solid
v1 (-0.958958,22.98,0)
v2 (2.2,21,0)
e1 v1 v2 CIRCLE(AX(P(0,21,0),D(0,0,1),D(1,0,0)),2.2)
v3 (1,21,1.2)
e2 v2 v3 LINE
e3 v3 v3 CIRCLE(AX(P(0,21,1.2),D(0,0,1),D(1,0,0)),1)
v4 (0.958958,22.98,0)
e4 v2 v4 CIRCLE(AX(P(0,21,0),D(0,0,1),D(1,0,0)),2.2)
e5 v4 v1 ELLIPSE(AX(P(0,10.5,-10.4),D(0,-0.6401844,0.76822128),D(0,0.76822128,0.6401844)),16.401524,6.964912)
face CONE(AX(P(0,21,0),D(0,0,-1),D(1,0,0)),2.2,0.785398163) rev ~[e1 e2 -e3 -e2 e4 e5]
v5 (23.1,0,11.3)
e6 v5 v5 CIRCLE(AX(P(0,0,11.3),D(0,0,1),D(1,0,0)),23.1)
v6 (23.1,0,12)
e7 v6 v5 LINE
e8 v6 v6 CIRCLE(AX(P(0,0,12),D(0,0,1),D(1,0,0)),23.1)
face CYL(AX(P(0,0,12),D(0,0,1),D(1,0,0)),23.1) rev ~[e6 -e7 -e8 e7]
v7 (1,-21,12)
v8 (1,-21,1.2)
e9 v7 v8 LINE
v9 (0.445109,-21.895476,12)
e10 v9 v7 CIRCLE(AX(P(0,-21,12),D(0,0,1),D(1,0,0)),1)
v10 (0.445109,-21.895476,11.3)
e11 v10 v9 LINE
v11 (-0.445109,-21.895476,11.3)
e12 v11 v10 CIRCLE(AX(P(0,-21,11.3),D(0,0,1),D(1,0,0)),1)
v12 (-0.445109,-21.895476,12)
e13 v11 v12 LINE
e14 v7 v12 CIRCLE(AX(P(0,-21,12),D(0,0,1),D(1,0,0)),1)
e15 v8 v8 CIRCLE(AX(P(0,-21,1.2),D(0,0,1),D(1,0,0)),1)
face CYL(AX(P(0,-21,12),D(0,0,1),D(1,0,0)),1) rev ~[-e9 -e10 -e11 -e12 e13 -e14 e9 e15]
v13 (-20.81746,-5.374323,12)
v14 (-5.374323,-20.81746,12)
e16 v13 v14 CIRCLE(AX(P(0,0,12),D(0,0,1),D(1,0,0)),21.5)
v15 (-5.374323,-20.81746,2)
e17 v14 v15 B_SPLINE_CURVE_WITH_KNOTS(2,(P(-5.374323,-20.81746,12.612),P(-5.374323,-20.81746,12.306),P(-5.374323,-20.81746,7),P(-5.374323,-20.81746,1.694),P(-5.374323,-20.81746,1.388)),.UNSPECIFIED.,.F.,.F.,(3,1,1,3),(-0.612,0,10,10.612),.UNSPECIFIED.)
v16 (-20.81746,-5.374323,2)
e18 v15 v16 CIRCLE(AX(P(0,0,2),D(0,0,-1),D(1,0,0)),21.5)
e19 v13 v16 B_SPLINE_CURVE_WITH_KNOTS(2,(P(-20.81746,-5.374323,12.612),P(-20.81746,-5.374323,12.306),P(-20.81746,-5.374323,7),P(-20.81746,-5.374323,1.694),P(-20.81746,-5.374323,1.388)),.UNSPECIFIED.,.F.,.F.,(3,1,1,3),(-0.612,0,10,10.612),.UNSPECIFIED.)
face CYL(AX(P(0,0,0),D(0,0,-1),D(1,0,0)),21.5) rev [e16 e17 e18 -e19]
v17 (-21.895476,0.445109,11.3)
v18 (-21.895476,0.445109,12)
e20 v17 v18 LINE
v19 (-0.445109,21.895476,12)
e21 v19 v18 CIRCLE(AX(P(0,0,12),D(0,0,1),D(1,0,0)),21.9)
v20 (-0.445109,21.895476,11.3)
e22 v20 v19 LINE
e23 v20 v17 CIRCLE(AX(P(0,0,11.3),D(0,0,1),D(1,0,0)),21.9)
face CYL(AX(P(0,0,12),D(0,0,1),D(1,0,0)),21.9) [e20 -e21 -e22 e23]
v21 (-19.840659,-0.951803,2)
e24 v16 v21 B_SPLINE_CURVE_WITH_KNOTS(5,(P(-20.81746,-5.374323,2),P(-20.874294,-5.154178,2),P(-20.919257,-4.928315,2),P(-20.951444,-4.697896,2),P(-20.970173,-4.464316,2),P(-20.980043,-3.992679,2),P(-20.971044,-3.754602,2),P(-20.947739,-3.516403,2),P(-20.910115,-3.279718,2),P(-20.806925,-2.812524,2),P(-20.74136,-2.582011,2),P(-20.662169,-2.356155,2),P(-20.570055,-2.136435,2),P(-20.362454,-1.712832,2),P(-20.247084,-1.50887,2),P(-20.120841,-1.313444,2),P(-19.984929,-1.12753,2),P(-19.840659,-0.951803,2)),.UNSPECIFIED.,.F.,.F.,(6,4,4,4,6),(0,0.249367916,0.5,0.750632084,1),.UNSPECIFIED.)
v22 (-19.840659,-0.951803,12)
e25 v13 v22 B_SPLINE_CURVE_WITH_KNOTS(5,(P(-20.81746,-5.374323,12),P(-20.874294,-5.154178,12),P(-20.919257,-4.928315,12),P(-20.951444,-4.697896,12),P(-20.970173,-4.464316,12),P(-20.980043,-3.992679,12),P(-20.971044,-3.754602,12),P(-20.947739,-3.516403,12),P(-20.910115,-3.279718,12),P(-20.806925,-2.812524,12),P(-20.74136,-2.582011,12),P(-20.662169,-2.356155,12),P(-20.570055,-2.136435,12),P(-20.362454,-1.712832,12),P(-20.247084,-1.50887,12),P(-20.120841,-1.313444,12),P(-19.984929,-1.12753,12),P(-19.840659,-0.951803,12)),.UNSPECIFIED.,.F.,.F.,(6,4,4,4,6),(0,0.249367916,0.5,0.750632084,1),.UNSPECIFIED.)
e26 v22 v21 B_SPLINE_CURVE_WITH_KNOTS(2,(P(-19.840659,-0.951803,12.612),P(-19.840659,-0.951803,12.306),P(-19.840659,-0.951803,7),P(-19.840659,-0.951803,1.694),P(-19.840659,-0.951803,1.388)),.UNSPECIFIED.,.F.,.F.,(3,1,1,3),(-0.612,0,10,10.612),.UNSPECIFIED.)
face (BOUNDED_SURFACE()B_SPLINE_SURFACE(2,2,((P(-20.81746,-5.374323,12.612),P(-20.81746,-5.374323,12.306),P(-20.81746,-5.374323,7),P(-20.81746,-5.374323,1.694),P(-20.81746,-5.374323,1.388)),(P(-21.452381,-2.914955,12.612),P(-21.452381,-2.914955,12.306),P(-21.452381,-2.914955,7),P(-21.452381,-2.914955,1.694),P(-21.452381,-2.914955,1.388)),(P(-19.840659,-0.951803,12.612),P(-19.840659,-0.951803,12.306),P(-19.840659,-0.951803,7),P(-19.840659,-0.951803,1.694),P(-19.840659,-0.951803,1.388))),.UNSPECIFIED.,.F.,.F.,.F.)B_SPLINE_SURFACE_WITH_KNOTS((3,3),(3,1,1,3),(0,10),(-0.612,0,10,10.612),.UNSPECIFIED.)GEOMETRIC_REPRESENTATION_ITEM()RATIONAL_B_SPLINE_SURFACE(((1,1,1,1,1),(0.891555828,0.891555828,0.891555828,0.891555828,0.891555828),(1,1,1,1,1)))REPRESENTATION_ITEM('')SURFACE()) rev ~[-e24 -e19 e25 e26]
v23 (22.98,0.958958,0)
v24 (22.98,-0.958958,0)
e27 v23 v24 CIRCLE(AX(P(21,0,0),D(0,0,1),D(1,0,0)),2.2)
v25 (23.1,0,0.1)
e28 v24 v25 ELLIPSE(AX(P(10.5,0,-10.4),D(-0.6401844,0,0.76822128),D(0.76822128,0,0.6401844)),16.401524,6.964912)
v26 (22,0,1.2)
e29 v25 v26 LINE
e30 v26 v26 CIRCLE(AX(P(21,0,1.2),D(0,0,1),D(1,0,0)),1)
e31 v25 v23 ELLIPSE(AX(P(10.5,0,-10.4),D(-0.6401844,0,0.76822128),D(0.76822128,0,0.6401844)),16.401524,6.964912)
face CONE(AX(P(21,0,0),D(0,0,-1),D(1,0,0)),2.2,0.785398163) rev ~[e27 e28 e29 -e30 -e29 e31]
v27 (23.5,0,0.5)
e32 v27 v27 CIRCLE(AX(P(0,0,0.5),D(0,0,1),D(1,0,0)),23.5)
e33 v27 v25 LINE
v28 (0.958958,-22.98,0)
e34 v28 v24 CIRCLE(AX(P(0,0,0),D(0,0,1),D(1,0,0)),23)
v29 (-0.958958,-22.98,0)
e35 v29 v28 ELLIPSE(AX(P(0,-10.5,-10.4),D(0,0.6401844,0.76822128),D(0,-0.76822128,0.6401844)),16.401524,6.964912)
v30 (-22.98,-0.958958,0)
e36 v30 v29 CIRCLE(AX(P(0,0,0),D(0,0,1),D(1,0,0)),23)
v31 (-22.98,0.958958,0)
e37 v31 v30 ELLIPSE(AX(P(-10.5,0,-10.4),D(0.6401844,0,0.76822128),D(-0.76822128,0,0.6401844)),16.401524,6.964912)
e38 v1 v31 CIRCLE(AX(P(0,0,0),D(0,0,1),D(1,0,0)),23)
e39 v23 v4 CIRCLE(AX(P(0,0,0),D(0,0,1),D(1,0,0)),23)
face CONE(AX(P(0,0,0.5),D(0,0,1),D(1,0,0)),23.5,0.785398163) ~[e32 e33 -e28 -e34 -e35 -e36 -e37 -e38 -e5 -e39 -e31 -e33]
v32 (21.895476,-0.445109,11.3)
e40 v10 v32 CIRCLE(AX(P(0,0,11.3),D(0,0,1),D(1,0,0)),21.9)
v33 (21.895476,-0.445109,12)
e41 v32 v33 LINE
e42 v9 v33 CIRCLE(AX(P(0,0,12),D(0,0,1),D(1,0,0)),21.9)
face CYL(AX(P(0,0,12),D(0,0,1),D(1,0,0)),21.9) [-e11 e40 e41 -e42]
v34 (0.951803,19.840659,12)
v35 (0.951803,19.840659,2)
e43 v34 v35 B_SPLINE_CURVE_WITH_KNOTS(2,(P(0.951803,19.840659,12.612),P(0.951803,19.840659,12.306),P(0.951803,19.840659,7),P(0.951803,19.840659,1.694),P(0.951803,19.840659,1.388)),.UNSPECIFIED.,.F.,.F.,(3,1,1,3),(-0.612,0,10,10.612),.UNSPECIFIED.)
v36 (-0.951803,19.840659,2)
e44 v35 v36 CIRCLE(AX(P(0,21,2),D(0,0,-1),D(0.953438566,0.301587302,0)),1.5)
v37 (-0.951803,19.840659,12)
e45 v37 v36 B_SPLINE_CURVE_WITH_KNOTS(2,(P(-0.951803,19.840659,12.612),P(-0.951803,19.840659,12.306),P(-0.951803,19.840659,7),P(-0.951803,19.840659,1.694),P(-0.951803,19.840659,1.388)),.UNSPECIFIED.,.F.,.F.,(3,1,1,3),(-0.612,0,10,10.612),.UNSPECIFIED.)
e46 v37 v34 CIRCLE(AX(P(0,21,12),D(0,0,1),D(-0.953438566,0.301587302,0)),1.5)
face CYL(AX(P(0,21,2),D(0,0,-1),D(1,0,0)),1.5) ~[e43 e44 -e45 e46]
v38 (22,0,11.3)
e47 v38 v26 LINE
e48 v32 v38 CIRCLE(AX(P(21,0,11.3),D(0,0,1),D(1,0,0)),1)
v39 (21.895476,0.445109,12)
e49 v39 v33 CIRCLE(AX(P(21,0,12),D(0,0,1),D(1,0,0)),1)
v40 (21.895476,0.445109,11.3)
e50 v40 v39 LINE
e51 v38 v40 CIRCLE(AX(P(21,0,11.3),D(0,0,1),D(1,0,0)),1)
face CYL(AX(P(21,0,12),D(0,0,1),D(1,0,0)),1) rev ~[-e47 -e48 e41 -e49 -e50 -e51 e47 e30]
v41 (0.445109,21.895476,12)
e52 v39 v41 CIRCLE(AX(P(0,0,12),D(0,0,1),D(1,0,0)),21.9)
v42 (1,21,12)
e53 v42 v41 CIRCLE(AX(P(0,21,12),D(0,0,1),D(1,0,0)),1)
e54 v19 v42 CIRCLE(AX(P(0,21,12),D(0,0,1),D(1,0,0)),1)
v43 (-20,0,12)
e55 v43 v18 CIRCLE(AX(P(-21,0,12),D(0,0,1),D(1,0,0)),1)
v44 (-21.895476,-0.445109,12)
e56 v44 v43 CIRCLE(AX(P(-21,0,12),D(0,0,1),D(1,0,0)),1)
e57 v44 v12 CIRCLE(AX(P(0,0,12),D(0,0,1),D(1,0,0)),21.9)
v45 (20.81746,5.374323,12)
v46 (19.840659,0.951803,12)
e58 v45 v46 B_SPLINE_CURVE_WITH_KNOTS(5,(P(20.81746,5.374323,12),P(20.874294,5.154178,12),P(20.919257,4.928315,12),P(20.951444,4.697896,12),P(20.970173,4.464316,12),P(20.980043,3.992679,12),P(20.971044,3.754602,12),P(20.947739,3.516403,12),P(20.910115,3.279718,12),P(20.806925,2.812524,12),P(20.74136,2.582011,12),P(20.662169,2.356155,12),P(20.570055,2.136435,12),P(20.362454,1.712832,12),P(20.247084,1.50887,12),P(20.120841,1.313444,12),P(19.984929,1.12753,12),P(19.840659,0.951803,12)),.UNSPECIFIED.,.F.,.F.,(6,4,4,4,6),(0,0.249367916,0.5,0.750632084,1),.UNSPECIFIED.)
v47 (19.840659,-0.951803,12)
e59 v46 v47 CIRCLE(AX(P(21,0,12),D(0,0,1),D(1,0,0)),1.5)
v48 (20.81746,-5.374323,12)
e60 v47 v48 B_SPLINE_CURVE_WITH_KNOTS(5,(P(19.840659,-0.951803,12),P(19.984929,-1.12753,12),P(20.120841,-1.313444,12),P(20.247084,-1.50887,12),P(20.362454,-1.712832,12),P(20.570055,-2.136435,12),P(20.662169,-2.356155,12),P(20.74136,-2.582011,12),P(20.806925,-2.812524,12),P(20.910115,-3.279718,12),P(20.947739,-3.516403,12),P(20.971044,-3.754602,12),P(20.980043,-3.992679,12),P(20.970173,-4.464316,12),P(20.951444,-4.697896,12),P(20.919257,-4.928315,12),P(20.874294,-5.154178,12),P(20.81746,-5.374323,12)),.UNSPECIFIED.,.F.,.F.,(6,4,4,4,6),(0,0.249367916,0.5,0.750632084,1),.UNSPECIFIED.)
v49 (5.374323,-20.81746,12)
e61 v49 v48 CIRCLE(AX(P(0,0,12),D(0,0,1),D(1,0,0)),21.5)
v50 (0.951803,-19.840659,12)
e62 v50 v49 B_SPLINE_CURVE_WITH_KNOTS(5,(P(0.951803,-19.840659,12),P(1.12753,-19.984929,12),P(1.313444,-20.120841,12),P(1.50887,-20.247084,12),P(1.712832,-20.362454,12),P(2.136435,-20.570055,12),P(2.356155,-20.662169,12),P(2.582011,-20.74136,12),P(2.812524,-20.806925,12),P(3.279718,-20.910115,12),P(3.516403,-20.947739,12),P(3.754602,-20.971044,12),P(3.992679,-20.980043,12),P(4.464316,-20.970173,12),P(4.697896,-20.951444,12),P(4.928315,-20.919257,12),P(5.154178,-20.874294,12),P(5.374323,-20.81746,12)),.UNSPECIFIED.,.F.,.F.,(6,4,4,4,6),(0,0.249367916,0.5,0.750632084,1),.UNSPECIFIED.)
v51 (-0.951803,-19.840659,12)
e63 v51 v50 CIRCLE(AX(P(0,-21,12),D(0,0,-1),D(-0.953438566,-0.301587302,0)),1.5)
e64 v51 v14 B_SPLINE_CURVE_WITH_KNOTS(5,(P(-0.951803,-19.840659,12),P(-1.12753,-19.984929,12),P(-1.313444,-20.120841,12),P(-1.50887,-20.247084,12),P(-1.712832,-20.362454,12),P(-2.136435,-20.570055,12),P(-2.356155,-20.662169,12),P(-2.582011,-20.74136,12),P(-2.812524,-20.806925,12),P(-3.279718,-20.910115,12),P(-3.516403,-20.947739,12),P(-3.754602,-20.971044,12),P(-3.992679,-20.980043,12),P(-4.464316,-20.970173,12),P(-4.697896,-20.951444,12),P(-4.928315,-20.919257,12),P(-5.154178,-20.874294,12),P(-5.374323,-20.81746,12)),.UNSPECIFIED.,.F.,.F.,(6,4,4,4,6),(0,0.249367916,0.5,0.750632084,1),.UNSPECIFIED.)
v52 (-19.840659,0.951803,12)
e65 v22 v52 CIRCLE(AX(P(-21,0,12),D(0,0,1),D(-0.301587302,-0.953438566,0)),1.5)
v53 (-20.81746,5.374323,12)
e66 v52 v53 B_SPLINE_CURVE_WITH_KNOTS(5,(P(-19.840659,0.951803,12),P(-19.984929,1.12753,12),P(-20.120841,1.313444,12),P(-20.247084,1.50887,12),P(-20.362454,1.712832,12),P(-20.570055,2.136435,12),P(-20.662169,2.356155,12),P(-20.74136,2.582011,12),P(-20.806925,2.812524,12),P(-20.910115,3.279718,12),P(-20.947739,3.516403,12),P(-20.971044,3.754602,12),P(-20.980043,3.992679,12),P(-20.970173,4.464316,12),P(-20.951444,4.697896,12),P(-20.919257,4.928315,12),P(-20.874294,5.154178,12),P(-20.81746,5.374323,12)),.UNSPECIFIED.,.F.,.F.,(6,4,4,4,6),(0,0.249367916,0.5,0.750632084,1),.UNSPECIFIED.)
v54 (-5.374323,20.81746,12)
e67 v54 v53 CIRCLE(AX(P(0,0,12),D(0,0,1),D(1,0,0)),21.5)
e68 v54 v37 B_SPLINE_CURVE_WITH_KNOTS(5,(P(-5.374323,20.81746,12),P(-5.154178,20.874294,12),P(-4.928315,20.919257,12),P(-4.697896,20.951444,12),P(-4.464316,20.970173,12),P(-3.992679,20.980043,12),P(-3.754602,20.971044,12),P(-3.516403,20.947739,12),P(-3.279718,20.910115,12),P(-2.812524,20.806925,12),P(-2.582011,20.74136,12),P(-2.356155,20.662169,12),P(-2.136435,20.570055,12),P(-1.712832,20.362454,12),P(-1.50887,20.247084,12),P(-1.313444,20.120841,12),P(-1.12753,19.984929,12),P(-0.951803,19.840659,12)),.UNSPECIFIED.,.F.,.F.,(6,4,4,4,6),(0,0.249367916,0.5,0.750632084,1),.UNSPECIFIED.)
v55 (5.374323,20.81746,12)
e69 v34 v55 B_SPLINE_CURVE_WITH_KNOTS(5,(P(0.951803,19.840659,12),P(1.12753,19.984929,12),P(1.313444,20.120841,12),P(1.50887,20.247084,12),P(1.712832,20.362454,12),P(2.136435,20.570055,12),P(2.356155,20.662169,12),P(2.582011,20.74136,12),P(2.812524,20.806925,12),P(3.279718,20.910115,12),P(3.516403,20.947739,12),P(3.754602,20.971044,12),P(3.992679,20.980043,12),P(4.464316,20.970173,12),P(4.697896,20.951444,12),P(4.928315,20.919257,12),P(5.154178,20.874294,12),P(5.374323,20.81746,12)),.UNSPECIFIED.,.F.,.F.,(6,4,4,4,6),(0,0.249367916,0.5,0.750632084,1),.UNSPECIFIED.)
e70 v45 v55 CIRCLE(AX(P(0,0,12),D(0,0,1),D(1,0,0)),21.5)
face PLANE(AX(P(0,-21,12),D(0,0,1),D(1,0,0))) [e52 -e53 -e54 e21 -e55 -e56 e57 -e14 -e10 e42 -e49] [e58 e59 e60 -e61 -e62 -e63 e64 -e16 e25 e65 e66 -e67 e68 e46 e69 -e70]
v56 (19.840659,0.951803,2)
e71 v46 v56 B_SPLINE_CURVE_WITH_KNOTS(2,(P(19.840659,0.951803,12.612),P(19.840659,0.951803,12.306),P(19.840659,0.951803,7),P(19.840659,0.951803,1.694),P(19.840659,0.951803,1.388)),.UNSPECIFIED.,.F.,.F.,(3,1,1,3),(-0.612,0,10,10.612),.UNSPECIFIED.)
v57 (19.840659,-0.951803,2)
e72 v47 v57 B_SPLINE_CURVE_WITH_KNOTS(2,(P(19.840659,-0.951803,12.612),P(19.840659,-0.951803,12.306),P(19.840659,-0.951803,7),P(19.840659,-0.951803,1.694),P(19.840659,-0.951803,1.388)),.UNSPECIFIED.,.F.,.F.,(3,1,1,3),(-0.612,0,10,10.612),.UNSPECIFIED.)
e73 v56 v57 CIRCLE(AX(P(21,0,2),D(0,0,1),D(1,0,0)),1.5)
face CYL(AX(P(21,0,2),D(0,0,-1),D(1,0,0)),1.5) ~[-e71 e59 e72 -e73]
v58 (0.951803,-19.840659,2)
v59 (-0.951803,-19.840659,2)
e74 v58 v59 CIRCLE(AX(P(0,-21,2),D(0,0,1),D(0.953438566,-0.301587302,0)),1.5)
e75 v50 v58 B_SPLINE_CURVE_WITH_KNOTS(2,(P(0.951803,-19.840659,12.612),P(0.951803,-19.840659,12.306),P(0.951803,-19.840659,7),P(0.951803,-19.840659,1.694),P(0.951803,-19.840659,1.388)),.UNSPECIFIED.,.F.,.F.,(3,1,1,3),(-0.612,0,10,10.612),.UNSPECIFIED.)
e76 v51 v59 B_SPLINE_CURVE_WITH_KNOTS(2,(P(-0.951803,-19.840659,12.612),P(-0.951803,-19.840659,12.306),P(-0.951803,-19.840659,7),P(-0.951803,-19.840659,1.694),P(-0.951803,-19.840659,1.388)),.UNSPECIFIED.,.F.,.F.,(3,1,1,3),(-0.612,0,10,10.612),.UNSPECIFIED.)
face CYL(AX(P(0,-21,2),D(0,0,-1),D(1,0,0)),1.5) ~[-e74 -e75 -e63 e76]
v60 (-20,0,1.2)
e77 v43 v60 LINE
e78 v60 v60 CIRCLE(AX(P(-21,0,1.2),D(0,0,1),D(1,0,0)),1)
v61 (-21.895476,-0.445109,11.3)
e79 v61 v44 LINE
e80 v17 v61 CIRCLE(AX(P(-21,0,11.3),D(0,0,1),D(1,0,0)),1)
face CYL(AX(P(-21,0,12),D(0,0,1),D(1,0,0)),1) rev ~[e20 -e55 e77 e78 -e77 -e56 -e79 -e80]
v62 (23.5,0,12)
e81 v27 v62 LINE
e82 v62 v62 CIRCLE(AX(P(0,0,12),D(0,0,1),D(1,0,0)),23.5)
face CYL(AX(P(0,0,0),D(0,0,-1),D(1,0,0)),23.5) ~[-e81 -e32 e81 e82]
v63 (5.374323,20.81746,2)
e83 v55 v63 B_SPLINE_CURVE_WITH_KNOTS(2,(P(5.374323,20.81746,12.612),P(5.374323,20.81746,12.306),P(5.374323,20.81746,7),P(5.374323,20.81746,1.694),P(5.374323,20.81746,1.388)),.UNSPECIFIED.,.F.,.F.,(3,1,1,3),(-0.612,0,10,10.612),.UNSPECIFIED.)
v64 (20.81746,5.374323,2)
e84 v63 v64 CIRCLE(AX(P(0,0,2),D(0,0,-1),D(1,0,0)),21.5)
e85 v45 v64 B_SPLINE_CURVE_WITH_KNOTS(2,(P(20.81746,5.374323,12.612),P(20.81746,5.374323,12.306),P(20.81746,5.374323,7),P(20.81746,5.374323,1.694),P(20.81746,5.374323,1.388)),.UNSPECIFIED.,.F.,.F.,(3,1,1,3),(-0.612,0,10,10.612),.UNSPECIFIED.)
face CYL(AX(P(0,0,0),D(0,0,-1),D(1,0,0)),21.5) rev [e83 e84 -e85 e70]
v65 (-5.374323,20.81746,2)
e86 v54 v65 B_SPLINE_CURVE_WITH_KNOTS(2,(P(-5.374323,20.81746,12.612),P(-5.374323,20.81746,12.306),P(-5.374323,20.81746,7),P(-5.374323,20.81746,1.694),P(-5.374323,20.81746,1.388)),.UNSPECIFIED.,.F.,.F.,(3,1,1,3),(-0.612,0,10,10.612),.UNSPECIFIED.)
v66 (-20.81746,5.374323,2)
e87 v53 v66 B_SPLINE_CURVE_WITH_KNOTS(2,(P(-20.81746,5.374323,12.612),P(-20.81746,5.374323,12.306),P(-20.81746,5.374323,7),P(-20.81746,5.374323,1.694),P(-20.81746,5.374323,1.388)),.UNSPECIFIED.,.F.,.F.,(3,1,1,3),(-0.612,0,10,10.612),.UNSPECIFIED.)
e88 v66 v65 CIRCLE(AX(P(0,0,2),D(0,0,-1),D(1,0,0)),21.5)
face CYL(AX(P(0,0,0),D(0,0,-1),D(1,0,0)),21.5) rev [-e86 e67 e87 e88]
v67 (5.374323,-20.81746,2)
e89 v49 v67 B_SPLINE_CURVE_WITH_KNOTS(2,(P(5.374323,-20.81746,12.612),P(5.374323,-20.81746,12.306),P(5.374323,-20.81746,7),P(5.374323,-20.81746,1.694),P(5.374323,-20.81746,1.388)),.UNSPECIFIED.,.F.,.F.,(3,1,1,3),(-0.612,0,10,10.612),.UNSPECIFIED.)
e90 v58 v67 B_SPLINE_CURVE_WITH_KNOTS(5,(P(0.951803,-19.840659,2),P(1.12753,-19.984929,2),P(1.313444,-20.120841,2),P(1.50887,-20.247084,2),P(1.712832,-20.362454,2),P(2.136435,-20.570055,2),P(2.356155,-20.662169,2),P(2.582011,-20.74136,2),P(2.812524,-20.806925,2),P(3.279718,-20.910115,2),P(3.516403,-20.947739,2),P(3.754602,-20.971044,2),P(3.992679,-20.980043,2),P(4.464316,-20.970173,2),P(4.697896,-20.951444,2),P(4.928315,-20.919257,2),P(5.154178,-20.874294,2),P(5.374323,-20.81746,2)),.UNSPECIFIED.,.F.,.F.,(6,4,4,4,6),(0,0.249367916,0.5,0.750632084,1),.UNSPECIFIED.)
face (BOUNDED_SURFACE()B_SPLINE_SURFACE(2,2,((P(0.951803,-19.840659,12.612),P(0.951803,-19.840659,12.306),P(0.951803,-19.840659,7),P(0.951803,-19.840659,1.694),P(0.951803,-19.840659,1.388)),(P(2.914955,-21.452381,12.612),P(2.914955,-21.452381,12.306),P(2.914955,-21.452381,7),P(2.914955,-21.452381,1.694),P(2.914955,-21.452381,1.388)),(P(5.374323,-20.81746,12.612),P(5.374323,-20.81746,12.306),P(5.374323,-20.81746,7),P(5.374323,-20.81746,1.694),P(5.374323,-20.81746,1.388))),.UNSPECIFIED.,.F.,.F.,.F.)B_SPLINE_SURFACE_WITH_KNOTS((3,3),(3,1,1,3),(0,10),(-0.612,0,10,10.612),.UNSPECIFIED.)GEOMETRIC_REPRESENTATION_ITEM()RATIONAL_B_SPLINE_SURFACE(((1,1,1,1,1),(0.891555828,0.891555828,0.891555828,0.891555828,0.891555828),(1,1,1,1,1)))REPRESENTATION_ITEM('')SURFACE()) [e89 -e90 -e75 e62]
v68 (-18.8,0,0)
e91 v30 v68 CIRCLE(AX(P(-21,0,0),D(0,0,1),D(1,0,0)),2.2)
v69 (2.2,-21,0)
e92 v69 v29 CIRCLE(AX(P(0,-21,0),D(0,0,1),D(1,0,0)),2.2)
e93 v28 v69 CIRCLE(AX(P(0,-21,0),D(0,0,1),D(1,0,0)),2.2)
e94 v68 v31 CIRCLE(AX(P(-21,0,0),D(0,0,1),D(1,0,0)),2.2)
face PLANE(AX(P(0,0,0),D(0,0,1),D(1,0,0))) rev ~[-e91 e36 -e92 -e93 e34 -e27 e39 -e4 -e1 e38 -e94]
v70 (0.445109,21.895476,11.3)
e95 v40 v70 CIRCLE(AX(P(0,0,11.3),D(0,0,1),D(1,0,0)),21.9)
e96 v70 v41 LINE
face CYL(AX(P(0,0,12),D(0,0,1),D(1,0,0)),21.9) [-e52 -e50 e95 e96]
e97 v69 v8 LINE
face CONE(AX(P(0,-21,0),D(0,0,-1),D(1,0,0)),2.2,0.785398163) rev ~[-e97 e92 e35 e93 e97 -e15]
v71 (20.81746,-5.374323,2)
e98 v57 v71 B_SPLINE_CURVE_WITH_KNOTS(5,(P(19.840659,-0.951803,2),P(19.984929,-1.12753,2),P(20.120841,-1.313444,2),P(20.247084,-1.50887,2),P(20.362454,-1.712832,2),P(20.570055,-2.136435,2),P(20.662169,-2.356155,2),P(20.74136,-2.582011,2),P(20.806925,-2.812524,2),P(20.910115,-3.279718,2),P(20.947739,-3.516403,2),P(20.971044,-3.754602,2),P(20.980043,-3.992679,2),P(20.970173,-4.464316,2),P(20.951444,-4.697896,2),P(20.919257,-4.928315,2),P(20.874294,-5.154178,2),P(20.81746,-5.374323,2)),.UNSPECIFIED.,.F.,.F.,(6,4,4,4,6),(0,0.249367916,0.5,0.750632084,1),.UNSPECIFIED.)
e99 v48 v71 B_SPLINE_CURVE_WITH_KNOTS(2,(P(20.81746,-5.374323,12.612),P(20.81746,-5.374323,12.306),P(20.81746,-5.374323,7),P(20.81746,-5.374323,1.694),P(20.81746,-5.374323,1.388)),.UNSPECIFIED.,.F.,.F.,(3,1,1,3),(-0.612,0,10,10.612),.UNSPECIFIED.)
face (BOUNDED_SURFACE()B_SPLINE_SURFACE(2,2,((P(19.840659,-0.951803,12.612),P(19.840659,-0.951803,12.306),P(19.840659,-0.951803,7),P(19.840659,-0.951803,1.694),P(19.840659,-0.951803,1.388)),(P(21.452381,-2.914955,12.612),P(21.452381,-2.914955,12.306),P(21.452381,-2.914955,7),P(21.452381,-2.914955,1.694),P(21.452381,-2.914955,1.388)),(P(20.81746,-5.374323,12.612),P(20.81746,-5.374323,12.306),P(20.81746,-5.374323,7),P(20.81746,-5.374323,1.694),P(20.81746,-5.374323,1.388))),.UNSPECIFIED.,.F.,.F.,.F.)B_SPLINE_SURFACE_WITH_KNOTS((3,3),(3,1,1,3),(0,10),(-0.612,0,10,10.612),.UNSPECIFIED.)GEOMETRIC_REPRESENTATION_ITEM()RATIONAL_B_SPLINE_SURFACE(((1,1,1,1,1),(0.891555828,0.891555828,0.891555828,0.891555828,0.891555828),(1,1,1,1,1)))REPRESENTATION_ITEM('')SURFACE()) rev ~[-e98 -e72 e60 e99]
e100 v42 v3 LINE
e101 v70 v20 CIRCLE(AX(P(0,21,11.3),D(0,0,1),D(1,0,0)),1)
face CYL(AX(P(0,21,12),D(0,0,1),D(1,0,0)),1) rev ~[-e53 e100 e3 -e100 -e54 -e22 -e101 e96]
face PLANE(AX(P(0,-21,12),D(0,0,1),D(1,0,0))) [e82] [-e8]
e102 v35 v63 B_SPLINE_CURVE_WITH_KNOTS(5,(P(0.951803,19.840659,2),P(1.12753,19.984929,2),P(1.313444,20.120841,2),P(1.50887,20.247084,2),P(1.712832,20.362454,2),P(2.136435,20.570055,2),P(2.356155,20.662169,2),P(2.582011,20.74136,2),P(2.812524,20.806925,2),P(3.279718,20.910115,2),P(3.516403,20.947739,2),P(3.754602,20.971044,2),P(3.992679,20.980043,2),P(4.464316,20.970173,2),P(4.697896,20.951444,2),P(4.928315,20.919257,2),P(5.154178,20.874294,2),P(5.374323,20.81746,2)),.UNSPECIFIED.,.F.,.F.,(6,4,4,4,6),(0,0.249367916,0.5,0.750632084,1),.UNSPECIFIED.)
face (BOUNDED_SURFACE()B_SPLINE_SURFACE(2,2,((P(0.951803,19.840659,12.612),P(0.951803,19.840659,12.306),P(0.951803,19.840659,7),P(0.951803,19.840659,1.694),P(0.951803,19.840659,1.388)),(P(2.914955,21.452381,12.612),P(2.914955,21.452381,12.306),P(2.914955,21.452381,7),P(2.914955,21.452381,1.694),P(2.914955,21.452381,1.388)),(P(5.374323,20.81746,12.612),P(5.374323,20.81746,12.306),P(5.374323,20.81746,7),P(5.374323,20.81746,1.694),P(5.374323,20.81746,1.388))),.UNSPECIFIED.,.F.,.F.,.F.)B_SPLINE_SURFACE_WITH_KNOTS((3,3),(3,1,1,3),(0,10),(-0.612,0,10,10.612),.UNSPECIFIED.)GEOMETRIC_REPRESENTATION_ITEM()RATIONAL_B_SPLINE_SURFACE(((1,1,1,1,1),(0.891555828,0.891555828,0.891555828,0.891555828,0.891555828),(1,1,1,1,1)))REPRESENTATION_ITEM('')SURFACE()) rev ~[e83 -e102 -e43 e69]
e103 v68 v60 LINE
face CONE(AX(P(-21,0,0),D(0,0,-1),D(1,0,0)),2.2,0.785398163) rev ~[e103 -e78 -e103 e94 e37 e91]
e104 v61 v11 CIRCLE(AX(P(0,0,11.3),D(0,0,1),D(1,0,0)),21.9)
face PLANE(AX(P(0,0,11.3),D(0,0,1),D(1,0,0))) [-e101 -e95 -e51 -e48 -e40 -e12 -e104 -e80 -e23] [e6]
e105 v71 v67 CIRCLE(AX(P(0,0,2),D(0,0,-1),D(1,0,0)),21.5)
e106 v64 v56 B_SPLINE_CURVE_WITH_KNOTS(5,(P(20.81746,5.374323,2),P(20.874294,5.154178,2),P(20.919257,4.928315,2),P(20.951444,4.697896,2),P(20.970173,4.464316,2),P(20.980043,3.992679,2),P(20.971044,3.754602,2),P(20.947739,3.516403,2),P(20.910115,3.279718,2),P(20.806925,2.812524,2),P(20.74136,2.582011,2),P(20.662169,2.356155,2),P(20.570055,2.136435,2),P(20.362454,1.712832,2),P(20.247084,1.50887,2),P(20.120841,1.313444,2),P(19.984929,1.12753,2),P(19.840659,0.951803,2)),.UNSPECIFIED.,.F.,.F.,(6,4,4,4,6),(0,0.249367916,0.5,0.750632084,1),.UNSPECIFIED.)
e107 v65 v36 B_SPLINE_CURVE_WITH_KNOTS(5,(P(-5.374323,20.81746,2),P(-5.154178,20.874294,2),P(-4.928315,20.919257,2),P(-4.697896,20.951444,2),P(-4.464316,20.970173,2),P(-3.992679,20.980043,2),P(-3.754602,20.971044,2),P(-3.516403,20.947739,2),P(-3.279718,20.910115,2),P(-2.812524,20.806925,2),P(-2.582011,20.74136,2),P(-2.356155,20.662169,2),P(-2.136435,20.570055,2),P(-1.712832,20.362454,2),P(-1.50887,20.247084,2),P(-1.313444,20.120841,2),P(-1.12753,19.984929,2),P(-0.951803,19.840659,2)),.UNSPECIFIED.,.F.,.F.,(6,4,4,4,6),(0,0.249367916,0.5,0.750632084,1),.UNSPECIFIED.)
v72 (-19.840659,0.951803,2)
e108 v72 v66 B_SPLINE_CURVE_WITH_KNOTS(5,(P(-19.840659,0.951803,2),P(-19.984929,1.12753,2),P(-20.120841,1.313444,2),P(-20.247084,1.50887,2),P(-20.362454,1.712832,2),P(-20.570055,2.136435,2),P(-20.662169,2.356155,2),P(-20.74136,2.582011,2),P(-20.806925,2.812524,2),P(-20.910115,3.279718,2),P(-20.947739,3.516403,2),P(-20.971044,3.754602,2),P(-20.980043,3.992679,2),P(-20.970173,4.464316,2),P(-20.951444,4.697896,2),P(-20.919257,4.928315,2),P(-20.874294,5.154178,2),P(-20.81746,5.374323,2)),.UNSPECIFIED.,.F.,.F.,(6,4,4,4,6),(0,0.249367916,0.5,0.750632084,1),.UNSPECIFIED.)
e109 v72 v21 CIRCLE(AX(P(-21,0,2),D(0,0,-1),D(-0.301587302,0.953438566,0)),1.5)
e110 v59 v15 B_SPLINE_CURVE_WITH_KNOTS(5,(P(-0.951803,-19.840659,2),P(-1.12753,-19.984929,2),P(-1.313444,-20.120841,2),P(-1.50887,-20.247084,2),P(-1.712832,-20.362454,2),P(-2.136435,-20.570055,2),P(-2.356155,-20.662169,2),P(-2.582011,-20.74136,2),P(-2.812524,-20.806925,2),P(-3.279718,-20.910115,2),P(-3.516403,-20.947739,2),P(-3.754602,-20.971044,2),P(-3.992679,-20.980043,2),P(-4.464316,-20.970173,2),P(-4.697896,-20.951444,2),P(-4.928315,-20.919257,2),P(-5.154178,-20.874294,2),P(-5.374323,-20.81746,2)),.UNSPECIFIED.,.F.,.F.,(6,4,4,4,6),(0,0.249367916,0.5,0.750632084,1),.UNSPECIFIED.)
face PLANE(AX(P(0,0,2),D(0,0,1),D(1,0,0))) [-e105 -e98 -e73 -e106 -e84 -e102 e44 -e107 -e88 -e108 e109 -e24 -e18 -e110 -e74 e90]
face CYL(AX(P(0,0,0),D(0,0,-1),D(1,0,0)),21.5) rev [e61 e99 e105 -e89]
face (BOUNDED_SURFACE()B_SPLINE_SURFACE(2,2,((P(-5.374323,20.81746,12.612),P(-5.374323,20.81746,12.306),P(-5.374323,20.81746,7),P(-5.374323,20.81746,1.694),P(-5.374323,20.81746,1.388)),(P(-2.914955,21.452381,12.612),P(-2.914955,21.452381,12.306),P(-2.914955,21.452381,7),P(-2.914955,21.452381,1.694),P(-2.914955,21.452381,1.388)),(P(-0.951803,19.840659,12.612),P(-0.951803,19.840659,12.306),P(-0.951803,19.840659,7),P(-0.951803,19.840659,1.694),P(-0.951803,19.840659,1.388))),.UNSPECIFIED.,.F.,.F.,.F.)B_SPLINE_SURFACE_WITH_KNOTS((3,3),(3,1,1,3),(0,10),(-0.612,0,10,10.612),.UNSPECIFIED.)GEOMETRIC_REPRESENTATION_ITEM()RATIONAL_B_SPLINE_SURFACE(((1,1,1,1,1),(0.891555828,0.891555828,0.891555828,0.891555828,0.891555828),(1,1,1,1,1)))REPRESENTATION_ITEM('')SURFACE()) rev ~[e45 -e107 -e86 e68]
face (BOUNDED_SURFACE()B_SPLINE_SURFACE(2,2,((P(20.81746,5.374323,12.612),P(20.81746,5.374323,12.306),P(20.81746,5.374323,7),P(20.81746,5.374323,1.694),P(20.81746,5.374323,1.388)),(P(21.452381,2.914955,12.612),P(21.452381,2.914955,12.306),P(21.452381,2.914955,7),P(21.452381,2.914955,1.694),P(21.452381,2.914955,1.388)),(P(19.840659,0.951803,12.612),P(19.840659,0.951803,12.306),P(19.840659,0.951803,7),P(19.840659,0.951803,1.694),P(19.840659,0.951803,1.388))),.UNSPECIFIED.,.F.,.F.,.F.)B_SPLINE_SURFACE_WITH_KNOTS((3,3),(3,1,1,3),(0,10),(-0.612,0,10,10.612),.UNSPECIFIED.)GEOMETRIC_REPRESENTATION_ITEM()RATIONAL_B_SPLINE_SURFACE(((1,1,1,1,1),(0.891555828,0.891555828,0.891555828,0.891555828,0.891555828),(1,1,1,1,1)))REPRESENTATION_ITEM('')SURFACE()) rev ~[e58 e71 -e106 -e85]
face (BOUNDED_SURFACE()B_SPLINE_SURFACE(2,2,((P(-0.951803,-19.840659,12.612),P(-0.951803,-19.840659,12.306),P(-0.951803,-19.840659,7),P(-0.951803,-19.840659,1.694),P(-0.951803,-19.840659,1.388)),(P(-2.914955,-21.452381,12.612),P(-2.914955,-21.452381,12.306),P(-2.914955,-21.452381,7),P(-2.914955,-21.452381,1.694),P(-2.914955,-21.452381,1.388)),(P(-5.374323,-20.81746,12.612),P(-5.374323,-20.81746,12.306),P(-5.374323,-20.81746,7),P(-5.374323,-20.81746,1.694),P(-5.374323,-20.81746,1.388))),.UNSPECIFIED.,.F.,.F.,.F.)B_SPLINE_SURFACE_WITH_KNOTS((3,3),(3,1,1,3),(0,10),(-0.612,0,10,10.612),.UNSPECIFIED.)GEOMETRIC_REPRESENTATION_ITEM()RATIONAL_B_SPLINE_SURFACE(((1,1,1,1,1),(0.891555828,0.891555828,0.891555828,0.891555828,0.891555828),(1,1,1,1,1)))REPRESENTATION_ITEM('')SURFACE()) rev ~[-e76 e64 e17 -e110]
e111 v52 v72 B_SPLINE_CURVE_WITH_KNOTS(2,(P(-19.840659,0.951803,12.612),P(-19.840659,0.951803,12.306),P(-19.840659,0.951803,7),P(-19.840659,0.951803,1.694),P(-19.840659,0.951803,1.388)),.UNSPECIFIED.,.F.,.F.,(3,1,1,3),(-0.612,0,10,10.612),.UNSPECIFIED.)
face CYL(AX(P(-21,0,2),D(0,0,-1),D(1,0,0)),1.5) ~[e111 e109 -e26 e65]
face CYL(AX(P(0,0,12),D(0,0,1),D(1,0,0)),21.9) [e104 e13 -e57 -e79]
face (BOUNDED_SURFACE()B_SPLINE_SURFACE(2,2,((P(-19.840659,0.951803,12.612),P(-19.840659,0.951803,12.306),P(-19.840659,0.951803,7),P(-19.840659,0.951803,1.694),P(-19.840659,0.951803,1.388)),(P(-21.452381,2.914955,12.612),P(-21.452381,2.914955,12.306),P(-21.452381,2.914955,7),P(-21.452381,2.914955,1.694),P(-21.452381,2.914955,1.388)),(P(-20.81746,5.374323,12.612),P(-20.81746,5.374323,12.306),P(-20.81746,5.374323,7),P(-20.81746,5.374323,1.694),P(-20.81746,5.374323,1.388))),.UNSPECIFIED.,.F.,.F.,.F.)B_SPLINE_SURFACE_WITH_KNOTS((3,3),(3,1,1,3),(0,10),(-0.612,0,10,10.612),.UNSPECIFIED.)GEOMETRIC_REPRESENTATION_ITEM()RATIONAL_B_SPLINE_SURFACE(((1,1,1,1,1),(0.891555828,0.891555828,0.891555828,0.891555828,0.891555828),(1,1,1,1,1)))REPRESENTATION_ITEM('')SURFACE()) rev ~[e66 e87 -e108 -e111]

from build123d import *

# Parameters (mm, degrees)
F0_R      = 23.5
F1_DEPTH  = 12
F2_T      = -2
F3_SIZE   = 0.5
F4_R      = 1.5
F5_DEPTH  = 10
F6_R      = 5
F7_R      = 1
F8_DEPTH  = 12.001
F9_R      = 23.1
F9_R_2    = 21.9
F10_DEPTH = 0.7


# Not quite as in the source:
# - a fillet or chamfer that OpenCascade refuses, or shapes differently, is made with other operations: its cross-section is extruded or revolved along the edge and cut away or added


with BuildPart() as f1:
    # F0 (on Top) → F1 (new body)
    with BuildSketch(Plane.XY):
        Circle(F0_R)
    extrude(amount=F1_DEPTH)

    # F2
    f2_openings = [f1.faces().sort_by_distance(p)[0] for p in [
        (0, 0, 12),
    ]]
    offset(amount=F2_T, openings=f2_openings)

    # F3
    f3_edges = [f1.edges().sort_by_distance(p)[0] for p in [
        (-23.5, 0, 0),
    ]]
    chamfer(f3_edges, length=F3_SIZE)

    # F4 (on face) → F5 (join, through all)
    with BuildSketch(Plane.XY.offset(2)):
        with Locations((0, -21)):
            Circle(F4_R)
        with Locations((21, 0)):
            Circle(F4_R)
        with Locations((0, 21)):
            Circle(F4_R)
        with Locations((-21, 0)):
            Circle(F4_R)
    extrude(amount=F5_DEPTH)

    # F6
    f6_edges = [f1.edges().sort_by_distance(p)[0] for p in [
        (-21.452381, 1.430158, 7),
        (-21.452381, -1.430158, 7),
        (-1.430158, 21.452381, 7),
        (1.430158, 21.452381, 7),
        (21.452381, -1.430158, 7),
        (21.452381, 1.430158, 7),
        (-1.430158, -21.452381, 7),
        (1.430158, -21.452381, 7),
    ]]
    fillet(f6_edges, radius=F6_R)

    # F7 (on face) → F8 (cut, through all)
    with BuildSketch(Plane.XY.offset(12)):
        with Locations((0, -21)):
            Circle(F7_R)
        with Locations((21, 0)):
            Circle(F7_R)
        with Locations((0, 21)):
            Circle(F7_R)
        with Locations((-21, 0)):
            Circle(F7_R)
    extrude(amount=-F8_DEPTH, mode=Mode.SUBTRACT)

    # F9 (on face) → F10 (cut)
    with BuildSketch(Plane.XY.offset(12)):
        Circle(F9_R)
        Circle(F9_R_2, mode=Mode.SUBTRACT)
    extrude(amount=-F10_DEPTH, mode=Mode.SUBTRACT)

    # F11: chamfer of 1.2 on 4 edges, made by hand

    # F11_s1 → F11_t2 (revolve, cut)
    with BuildSketch(Plane.XZ.offset(-21)):
        Polygon((2.2, 0), (1, 1.2), (1, 0), align=None)
    revolve(axis=Axis((0, 21, 0), (0, 0, 1)), mode=Mode.SUBTRACT)

    # F11_s3 → F11_t4 (revolve, cut)
    with BuildSketch(Plane.XZ):
        Polygon((23.2, 0), (22, 1.2), (22, 0), align=None)
    revolve(axis=Axis((21, 0, 0), (0, 0, 1)), mode=Mode.SUBTRACT)

    # F11_s5 → F11_t6 (revolve, cut)
    with BuildSketch(Plane.XZ.offset(21)):
        Polygon((2.2, 0), (1, 1.2), (1, 0), align=None)
    revolve(axis=Axis((0, -21, 0), (0, 0, 1)), mode=Mode.SUBTRACT)

    # F11_s7 → F11_t8 (revolve, cut)
    with BuildSketch(Plane.XZ):
        Polygon((-18.8, 0), (-20, 1.2), (-20, 0), align=None)
    revolve(axis=Axis((-21, 0, 0), (0, 0, 1)), mode=Mode.SUBTRACT)


solid = f1.part
